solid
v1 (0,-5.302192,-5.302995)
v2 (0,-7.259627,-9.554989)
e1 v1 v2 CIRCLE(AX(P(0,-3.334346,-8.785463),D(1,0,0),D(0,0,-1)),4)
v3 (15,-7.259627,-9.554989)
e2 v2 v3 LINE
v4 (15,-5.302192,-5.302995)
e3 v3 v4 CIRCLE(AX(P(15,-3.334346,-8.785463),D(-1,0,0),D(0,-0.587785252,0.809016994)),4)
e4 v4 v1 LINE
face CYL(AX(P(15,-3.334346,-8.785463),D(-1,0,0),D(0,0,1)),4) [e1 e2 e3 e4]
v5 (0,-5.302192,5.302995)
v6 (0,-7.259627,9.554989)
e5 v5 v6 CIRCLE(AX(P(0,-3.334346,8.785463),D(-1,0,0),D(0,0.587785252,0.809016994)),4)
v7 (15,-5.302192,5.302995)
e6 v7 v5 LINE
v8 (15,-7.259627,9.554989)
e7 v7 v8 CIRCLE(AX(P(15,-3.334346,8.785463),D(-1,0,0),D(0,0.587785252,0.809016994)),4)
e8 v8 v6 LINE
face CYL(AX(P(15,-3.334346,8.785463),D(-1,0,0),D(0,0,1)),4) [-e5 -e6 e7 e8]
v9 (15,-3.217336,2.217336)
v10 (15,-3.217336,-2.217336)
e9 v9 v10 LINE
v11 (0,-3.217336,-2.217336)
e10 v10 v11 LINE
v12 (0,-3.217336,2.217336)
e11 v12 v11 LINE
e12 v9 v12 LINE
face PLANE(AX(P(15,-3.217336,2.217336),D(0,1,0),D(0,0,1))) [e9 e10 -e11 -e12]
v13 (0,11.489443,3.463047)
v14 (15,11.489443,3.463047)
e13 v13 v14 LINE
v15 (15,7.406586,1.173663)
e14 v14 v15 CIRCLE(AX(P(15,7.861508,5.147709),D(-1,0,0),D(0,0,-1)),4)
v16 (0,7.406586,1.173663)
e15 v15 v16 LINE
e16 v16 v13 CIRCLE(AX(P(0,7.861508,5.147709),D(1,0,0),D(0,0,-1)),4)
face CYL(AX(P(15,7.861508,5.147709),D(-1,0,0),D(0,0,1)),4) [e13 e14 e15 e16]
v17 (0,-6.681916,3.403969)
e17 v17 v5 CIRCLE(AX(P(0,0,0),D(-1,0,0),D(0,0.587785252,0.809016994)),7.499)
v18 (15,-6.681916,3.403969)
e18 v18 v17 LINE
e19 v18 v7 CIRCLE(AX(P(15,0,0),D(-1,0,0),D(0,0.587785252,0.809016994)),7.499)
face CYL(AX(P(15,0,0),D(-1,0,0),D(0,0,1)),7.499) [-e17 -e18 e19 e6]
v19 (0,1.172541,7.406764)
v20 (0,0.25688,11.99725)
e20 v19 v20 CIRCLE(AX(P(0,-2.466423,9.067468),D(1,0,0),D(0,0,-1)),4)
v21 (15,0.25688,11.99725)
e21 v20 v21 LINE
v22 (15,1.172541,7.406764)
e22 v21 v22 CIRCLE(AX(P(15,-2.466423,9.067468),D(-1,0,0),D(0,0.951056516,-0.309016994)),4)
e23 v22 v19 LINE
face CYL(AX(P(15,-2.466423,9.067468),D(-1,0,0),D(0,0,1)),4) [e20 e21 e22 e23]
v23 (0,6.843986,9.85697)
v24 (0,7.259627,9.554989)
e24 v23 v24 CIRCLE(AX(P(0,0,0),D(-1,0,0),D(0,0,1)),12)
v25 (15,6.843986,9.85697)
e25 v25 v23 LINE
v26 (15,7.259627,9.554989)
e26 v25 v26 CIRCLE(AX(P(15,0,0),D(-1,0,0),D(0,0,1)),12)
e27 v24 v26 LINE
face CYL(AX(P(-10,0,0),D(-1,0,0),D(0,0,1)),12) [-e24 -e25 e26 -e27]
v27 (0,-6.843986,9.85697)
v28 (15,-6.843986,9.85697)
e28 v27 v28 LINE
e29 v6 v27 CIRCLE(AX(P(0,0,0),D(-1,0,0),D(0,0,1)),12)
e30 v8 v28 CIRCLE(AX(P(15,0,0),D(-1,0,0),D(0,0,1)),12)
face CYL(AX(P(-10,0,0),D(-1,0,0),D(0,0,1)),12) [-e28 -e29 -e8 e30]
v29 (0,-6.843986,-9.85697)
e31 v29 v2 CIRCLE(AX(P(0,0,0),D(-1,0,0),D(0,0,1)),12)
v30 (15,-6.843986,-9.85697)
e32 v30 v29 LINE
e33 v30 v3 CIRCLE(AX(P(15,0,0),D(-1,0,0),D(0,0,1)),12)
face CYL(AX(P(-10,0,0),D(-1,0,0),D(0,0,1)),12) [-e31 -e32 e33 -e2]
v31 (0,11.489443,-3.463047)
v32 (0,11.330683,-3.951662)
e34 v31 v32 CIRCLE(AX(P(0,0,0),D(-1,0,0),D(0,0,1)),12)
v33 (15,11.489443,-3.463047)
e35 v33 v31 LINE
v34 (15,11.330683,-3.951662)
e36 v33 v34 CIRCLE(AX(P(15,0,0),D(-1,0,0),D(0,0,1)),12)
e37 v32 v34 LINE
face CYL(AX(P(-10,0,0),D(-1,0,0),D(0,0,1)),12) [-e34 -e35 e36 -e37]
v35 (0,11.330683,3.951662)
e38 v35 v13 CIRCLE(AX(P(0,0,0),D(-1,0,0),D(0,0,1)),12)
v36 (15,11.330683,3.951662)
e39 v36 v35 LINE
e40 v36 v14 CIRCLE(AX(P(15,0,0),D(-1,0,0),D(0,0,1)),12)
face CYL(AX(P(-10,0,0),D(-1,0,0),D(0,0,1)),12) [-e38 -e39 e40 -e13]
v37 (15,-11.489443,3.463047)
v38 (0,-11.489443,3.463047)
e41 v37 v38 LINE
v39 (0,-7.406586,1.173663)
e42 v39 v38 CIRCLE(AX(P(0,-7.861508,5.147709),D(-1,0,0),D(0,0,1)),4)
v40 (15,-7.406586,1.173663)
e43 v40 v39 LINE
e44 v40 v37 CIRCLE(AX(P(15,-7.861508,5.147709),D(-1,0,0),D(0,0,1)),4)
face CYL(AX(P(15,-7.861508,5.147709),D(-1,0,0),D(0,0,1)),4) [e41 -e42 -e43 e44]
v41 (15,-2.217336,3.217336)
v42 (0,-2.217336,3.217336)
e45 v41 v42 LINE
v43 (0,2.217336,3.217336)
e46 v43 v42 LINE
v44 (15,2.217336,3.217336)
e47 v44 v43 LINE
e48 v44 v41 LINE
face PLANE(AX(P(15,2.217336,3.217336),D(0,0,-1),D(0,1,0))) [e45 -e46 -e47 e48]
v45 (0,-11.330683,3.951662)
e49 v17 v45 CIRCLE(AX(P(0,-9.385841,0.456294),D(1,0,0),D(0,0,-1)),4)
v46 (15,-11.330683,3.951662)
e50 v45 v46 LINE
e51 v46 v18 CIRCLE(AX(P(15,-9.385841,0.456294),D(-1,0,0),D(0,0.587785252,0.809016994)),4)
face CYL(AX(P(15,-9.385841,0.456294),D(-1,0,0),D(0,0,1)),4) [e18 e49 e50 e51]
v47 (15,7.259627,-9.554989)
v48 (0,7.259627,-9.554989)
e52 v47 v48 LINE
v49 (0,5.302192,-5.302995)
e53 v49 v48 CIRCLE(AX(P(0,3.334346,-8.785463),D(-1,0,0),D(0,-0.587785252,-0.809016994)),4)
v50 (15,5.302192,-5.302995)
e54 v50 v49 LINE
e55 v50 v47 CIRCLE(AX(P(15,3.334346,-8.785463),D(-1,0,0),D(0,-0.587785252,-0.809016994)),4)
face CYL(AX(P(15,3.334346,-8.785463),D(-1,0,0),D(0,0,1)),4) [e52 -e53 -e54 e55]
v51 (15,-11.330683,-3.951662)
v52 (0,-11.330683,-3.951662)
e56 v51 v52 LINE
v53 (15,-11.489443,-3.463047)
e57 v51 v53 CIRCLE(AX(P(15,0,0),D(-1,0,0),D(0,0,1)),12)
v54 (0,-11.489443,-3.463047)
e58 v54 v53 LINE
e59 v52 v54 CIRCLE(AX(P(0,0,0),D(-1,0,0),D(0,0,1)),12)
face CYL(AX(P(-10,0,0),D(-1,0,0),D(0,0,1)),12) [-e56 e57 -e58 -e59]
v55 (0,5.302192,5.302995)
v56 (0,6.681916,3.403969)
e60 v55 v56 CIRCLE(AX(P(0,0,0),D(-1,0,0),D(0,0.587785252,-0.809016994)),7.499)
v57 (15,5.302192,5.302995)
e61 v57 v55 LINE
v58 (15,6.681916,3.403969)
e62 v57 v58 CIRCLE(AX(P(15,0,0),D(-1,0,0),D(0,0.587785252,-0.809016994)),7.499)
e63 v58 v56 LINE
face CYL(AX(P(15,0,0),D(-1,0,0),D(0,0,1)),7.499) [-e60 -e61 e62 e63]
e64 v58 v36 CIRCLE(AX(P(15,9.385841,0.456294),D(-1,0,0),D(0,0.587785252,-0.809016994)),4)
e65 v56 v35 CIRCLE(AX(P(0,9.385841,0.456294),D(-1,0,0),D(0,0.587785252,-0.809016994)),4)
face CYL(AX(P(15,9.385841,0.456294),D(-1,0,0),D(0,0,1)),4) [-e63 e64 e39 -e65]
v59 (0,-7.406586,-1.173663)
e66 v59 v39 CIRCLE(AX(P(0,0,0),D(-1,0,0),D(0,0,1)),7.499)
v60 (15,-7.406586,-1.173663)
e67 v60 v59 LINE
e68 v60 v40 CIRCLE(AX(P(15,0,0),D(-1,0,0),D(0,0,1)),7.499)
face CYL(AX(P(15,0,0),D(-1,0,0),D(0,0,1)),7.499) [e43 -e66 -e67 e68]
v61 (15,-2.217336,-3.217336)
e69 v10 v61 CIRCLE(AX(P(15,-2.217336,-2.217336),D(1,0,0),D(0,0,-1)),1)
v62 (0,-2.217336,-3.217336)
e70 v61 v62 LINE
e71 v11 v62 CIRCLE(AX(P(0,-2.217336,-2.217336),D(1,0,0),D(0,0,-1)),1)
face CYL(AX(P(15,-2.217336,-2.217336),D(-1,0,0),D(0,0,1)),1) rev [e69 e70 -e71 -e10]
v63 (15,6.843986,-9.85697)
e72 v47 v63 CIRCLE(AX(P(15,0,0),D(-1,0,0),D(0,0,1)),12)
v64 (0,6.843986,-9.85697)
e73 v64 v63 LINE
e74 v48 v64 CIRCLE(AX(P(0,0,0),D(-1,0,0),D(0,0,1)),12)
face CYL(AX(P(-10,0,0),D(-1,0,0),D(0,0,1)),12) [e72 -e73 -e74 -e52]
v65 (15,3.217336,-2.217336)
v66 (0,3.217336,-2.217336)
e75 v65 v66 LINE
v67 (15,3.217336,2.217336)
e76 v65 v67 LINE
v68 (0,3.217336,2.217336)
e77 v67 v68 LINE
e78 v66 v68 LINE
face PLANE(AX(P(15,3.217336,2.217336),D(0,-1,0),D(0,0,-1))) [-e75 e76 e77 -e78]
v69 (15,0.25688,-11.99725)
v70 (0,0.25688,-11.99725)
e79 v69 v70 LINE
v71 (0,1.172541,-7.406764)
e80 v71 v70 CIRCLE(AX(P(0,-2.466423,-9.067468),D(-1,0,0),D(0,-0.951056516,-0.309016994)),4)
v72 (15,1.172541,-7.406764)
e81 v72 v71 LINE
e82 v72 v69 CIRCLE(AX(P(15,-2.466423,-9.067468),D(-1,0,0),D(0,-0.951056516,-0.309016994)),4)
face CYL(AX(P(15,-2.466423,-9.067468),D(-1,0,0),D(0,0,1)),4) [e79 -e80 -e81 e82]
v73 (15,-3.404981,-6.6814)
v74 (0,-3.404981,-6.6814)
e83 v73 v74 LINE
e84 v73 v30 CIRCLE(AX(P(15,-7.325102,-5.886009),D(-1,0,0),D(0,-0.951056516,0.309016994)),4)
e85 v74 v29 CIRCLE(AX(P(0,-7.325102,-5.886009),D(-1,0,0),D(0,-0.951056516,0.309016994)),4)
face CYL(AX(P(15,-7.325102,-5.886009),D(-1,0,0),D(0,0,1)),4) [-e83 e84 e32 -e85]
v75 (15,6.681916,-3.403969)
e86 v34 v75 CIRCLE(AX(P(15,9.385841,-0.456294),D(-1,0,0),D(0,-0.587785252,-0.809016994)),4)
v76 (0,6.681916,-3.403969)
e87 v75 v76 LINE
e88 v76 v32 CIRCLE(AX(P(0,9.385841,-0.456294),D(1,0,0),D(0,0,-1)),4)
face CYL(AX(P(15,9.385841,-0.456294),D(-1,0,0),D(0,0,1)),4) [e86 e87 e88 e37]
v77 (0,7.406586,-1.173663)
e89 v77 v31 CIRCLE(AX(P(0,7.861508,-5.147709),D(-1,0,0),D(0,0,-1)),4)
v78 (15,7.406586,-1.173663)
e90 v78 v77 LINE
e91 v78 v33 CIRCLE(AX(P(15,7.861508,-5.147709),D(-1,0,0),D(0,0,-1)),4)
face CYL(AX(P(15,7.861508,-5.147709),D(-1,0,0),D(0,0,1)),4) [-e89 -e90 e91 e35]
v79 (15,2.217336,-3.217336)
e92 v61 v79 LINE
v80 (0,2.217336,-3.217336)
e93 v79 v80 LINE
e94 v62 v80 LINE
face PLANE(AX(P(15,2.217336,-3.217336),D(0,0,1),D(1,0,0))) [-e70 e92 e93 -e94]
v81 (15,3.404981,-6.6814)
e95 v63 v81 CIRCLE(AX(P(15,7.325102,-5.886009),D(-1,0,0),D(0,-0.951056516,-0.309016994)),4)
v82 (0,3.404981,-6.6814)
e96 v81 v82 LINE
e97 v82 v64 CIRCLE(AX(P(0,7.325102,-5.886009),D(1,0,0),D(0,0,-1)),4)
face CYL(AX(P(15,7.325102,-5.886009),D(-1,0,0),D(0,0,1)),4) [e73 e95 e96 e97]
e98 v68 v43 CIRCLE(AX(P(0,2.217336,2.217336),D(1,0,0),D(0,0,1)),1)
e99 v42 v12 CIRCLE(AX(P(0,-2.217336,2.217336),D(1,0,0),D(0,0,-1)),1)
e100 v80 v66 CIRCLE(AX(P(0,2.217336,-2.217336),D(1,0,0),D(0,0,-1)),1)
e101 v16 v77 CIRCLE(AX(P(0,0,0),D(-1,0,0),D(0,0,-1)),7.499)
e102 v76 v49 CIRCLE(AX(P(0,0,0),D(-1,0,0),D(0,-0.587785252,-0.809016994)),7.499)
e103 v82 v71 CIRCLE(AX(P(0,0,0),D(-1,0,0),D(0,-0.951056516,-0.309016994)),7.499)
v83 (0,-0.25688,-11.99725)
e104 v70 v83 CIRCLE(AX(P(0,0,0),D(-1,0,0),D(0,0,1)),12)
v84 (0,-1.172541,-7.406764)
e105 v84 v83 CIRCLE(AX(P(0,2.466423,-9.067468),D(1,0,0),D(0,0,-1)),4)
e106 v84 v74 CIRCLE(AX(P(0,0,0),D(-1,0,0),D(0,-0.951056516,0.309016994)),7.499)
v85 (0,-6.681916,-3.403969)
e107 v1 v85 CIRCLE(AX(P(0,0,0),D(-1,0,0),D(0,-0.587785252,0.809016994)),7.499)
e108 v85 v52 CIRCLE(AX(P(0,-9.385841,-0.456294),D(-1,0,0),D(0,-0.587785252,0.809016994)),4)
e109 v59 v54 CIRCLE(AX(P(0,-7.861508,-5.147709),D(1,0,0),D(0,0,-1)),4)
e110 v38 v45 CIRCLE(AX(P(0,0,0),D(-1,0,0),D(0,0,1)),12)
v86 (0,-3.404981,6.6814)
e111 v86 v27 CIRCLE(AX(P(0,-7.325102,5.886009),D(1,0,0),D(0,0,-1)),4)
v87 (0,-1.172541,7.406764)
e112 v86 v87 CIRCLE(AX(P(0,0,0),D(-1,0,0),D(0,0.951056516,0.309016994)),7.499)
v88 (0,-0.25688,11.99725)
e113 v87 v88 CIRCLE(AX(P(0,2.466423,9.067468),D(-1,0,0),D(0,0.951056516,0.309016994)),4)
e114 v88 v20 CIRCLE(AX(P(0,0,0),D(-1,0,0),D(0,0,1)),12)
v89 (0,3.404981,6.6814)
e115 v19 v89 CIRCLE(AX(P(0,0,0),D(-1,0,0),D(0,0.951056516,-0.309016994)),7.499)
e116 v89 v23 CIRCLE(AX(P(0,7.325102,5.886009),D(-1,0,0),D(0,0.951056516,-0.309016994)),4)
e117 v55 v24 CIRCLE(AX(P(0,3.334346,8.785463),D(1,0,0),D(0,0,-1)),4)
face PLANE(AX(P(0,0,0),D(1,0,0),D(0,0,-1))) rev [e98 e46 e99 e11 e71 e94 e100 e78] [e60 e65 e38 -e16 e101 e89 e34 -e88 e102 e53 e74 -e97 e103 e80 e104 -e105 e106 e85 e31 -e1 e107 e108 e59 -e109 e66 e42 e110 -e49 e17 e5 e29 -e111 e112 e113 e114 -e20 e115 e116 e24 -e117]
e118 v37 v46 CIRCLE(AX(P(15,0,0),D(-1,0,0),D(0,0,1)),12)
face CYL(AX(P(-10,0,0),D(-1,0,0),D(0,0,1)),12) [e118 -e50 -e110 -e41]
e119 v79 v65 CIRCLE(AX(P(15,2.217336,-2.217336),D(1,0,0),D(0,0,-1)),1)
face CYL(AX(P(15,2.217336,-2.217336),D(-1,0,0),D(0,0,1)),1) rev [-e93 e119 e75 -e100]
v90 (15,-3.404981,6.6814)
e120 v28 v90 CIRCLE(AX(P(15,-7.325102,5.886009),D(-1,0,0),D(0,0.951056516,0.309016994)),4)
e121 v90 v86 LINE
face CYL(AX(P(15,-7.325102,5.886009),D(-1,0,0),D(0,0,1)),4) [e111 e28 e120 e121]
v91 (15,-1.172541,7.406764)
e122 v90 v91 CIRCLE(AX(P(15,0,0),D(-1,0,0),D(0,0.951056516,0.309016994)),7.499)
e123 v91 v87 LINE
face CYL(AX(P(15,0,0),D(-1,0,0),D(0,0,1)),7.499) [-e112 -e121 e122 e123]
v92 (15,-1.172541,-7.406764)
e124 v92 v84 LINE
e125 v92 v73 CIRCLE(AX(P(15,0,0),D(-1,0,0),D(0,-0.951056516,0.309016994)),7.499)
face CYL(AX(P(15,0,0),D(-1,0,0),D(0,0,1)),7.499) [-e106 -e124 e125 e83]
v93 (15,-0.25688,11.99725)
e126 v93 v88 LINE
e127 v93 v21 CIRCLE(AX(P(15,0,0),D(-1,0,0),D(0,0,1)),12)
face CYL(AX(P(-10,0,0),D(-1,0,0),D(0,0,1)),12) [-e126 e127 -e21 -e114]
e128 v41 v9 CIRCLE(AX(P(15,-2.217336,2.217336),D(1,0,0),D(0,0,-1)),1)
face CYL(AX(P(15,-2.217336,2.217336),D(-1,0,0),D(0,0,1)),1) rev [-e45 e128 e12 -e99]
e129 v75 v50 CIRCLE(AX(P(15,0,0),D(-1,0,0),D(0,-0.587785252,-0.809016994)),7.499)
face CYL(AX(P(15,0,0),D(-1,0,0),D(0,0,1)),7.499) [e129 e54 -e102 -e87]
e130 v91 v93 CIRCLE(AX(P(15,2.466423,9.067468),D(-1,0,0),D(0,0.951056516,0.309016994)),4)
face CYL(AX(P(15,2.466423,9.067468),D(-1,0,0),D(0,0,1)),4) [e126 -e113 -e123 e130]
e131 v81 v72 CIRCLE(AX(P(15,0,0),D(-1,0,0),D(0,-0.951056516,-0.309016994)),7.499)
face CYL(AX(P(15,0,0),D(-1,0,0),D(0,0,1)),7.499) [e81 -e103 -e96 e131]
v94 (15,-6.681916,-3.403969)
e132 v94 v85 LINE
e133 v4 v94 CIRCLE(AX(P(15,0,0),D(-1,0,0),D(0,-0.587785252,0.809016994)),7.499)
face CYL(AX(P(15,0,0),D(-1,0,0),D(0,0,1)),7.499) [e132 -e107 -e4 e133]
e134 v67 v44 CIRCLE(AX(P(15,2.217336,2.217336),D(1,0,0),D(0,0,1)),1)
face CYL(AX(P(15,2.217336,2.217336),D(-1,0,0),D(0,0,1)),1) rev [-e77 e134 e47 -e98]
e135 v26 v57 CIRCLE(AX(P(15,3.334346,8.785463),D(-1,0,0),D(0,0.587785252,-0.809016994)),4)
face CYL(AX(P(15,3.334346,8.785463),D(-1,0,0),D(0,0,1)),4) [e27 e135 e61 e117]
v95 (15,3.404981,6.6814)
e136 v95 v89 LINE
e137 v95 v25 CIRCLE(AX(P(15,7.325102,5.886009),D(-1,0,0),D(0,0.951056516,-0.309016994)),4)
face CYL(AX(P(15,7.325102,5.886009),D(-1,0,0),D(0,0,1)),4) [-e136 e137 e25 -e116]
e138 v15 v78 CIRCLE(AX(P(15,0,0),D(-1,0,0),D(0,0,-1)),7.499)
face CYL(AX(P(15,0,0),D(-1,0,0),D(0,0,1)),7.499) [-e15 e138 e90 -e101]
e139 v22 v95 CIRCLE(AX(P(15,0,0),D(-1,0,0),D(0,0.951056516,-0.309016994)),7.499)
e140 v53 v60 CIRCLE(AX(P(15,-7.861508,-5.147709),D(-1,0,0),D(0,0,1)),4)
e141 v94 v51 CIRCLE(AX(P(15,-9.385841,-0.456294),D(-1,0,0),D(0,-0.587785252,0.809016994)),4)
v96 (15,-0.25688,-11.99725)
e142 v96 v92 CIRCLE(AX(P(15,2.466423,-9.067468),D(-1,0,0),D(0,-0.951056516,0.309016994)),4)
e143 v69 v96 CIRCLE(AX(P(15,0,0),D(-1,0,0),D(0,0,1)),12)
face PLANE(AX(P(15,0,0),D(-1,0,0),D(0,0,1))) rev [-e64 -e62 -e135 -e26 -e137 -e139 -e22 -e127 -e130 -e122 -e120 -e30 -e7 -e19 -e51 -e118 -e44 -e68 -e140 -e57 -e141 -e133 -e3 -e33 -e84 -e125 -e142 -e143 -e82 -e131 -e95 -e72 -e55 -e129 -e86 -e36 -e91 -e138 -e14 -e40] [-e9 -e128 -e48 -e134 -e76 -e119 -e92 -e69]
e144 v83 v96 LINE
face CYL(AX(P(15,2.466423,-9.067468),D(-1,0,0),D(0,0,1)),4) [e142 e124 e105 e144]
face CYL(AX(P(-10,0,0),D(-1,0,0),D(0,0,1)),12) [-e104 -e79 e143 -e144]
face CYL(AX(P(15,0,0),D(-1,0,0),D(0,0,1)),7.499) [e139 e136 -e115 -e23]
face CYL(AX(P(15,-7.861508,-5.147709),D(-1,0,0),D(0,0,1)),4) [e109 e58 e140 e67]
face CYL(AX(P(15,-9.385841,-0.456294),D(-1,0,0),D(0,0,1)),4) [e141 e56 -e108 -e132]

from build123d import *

# Parameters (mm, degrees)
SPUR_GEAR_GB_BORE_OUTLINE_R = 1
SPUR_GEAR_GB_BORE_DEPTH     = 15
CUT_EXTRUDE_3_DEPTH         = 15


# Read off the part's stored shape, not the designer's step: <spur gear_gb>-<Bore>
with BuildPart() as part:
    # <spur gear_gb>-<Bore> outline → <spur gear_gb>-<Bore> (new body)
    with BuildSketch(Plane.YZ):
        with BuildLine():
            ThreePointArc((-0.256880001, -11.997250213), (0, -12), (0.256880001, -11.997250213))
            ThreePointArc((0.256880001, -11.997250213), (1.456299749, -9.849931218), (1.172541409, -7.406763642))
            ThreePointArc((1.172541409, -7.406763642), (2.317318441, -7.131972816), (3.404980509, -6.681400207))
            ThreePointArc((3.404980509, -6.681400207), (4.61147306, -8.824753264), (6.843986457, -9.856969584))
            ThreePointArc((6.843986457, -9.856969584), (7.053423027, -9.708203933), (7.259627029, -9.554989032))
            ThreePointArc((7.259627029, -9.554989032), (6.967815552, -7.112770233), (5.302192362, -5.302995112))
            ThreePointArc((5.302192362, -5.302995112), (6.066818441, -4.407801607), (6.681915604, -3.403968986))
            ThreePointArc((6.681915604, -3.403968986), (8.917819898, -4.428819506), (11.330682707, -3.9516616))
            ThreePointArc((11.330682707, -3.9516616), (11.412678196, -3.708203933), (11.489443278, -3.463046803))
            ThreePointArc((11.489443278, -3.463046803), (9.817862641, -1.658772773), (7.406586048, -1.173662691))
            ThreePointArc((7.406586048, -1.173662691), (7.499, 0), (7.406586048, 1.173662691))
            ThreePointArc((7.406586048, 1.173662691), (9.817862641, 1.658772773), (11.489443278, 3.463046803))
            ThreePointArc((11.489443278, 3.463046803), (11.412678196, 3.708203933), (11.330682707, 3.9516616))
            ThreePointArc((11.330682707, 3.9516616), (8.917819898, 4.428819506), (6.681915604, 3.403968986))
            ThreePointArc((6.681915604, 3.403968986), (6.066818441, 4.407801607), (5.302192362, 5.302995112))
            ThreePointArc((5.302192362, 5.302995112), (6.967815552, 7.112770233), (7.259627029, 9.554989032))
            ThreePointArc((7.259627029, 9.554989032), (7.053423027, 9.708203933), (6.843986457, 9.856969584))
            ThreePointArc((6.843986457, 9.856969584), (4.61147306, 8.824753264), (3.404980509, 6.681400207))
            ThreePointArc((3.404980509, 6.681400207), (2.317318441, 7.131972816), (1.172541409, 7.406763642))
            ThreePointArc((1.172541409, 7.406763642), (1.456299749, 9.849931218), (0.256880001, 11.997250213))
            ThreePointArc((0.256880001, 11.997250213), (0, 12), (-0.256880001, 11.997250213))
            ThreePointArc((-0.256880001, 11.997250213), (-1.456299749, 9.849931218), (-1.172541409, 7.406763642))
            ThreePointArc((-1.172541409, 7.406763642), (-2.317318441, 7.131972816), (-3.404980509, 6.681400207))
            ThreePointArc((-3.404980509, 6.681400207), (-4.61147306, 8.824753264), (-6.843986457, 9.856969584))
            ThreePointArc((-6.843986457, 9.856969584), (-7.053423027, 9.708203933), (-7.259627029, 9.554989032))
            ThreePointArc((-7.259627029, 9.554989032), (-6.967815552, 7.112770233), (-5.302192362, 5.302995112))
            ThreePointArc((-5.302192362, 5.302995112), (-6.066818441, 4.407801607), (-6.681915604, 3.403968986))
            ThreePointArc((-6.681915604, 3.403968986), (-8.917819898, 4.428819506), (-11.330682707, 3.9516616))
            ThreePointArc((-11.330682707, 3.9516616), (-11.412678196, 3.708203933), (-11.489443278, 3.463046803))
            ThreePointArc((-11.489443278, 3.463046803), (-9.817862641, 1.658772773), (-7.406586048, 1.173662691))
            ThreePointArc((-7.406586048, 1.173662691), (-7.499, 0), (-7.406586048, -1.173662691))
            ThreePointArc((-7.406586048, -1.173662691), (-9.817862641, -1.658772773), (-11.489443278, -3.463046803))
            ThreePointArc((-11.489443278, -3.463046803), (-11.412678196, -3.708203933), (-11.330682707, -3.9516616))
            ThreePointArc((-11.330682707, -3.9516616), (-8.917819898, -4.428819506), (-6.681915604, -3.403968986))
            ThreePointArc((-6.681915604, -3.403968986), (-6.066818441, -4.407801607), (-5.302192362, -5.302995112))
            ThreePointArc((-5.302192362, -5.302995112), (-6.967815552, -7.112770233), (-7.259627029, -9.554989032))
            ThreePointArc((-7.259627029, -9.554989032), (-7.053423027, -9.708203933), (-6.843986457, -9.856969584))
            ThreePointArc((-6.843986457, -9.856969584), (-4.61147306, -8.824753264), (-3.404980509, -6.681400207))
            ThreePointArc((-3.404980509, -6.681400207), (-2.317318441, -7.131972816), (-1.172541409, -7.406763642))
            ThreePointArc((-1.172541409, -7.406763642), (-1.456299749, -9.849931218), (-0.256880001, -11.997250213))
        make_face()
        Circle(SPUR_GEAR_GB_BORE_OUTLINE_R, mode=Mode.SUBTRACT)
    extrude(amount=SPUR_GEAR_GB_BORE_DEPTH)

    # 草图8 → 切除-拉伸3 (cut)
    with BuildSketch(Plane(origin=(0, 0, 0), x_dir=(0, 0, -1), z_dir=(1, 0, 0))):
        with BuildLine():
            Line((-2.217335854, 3.217335854), (2.217335854, 3.217335854))
            ThreePointArc((2.217335854, 3.217335854), (2.924442636, 2.924442636), (3.217335854, 2.217335854))
            Line((3.217335854, 2.217335854), (3.217335854, -2.217335854))
            ThreePointArc((3.217335854, -2.217335854), (2.924442636, -2.924442636), (2.217335854, -3.217335854))
            Line((2.217335854, -3.217335854), (-2.217335854, -3.217335854))
            ThreePointArc((-2.217335854, -3.217335854), (-2.924442636, -2.924442636), (-3.217335854, -2.217335854))
            Line((-3.217335854, -2.217335854), (-3.217335854, 2.217335854))
            ThreePointArc((-3.217335854, 2.217335854), (-2.924442636, 2.924442636), (-2.217335854, 3.217335854))
        make_face()
    extrude(amount=CUT_EXTRUDE_3_DEPTH, mode=Mode.SUBTRACT)


solid = part.part
